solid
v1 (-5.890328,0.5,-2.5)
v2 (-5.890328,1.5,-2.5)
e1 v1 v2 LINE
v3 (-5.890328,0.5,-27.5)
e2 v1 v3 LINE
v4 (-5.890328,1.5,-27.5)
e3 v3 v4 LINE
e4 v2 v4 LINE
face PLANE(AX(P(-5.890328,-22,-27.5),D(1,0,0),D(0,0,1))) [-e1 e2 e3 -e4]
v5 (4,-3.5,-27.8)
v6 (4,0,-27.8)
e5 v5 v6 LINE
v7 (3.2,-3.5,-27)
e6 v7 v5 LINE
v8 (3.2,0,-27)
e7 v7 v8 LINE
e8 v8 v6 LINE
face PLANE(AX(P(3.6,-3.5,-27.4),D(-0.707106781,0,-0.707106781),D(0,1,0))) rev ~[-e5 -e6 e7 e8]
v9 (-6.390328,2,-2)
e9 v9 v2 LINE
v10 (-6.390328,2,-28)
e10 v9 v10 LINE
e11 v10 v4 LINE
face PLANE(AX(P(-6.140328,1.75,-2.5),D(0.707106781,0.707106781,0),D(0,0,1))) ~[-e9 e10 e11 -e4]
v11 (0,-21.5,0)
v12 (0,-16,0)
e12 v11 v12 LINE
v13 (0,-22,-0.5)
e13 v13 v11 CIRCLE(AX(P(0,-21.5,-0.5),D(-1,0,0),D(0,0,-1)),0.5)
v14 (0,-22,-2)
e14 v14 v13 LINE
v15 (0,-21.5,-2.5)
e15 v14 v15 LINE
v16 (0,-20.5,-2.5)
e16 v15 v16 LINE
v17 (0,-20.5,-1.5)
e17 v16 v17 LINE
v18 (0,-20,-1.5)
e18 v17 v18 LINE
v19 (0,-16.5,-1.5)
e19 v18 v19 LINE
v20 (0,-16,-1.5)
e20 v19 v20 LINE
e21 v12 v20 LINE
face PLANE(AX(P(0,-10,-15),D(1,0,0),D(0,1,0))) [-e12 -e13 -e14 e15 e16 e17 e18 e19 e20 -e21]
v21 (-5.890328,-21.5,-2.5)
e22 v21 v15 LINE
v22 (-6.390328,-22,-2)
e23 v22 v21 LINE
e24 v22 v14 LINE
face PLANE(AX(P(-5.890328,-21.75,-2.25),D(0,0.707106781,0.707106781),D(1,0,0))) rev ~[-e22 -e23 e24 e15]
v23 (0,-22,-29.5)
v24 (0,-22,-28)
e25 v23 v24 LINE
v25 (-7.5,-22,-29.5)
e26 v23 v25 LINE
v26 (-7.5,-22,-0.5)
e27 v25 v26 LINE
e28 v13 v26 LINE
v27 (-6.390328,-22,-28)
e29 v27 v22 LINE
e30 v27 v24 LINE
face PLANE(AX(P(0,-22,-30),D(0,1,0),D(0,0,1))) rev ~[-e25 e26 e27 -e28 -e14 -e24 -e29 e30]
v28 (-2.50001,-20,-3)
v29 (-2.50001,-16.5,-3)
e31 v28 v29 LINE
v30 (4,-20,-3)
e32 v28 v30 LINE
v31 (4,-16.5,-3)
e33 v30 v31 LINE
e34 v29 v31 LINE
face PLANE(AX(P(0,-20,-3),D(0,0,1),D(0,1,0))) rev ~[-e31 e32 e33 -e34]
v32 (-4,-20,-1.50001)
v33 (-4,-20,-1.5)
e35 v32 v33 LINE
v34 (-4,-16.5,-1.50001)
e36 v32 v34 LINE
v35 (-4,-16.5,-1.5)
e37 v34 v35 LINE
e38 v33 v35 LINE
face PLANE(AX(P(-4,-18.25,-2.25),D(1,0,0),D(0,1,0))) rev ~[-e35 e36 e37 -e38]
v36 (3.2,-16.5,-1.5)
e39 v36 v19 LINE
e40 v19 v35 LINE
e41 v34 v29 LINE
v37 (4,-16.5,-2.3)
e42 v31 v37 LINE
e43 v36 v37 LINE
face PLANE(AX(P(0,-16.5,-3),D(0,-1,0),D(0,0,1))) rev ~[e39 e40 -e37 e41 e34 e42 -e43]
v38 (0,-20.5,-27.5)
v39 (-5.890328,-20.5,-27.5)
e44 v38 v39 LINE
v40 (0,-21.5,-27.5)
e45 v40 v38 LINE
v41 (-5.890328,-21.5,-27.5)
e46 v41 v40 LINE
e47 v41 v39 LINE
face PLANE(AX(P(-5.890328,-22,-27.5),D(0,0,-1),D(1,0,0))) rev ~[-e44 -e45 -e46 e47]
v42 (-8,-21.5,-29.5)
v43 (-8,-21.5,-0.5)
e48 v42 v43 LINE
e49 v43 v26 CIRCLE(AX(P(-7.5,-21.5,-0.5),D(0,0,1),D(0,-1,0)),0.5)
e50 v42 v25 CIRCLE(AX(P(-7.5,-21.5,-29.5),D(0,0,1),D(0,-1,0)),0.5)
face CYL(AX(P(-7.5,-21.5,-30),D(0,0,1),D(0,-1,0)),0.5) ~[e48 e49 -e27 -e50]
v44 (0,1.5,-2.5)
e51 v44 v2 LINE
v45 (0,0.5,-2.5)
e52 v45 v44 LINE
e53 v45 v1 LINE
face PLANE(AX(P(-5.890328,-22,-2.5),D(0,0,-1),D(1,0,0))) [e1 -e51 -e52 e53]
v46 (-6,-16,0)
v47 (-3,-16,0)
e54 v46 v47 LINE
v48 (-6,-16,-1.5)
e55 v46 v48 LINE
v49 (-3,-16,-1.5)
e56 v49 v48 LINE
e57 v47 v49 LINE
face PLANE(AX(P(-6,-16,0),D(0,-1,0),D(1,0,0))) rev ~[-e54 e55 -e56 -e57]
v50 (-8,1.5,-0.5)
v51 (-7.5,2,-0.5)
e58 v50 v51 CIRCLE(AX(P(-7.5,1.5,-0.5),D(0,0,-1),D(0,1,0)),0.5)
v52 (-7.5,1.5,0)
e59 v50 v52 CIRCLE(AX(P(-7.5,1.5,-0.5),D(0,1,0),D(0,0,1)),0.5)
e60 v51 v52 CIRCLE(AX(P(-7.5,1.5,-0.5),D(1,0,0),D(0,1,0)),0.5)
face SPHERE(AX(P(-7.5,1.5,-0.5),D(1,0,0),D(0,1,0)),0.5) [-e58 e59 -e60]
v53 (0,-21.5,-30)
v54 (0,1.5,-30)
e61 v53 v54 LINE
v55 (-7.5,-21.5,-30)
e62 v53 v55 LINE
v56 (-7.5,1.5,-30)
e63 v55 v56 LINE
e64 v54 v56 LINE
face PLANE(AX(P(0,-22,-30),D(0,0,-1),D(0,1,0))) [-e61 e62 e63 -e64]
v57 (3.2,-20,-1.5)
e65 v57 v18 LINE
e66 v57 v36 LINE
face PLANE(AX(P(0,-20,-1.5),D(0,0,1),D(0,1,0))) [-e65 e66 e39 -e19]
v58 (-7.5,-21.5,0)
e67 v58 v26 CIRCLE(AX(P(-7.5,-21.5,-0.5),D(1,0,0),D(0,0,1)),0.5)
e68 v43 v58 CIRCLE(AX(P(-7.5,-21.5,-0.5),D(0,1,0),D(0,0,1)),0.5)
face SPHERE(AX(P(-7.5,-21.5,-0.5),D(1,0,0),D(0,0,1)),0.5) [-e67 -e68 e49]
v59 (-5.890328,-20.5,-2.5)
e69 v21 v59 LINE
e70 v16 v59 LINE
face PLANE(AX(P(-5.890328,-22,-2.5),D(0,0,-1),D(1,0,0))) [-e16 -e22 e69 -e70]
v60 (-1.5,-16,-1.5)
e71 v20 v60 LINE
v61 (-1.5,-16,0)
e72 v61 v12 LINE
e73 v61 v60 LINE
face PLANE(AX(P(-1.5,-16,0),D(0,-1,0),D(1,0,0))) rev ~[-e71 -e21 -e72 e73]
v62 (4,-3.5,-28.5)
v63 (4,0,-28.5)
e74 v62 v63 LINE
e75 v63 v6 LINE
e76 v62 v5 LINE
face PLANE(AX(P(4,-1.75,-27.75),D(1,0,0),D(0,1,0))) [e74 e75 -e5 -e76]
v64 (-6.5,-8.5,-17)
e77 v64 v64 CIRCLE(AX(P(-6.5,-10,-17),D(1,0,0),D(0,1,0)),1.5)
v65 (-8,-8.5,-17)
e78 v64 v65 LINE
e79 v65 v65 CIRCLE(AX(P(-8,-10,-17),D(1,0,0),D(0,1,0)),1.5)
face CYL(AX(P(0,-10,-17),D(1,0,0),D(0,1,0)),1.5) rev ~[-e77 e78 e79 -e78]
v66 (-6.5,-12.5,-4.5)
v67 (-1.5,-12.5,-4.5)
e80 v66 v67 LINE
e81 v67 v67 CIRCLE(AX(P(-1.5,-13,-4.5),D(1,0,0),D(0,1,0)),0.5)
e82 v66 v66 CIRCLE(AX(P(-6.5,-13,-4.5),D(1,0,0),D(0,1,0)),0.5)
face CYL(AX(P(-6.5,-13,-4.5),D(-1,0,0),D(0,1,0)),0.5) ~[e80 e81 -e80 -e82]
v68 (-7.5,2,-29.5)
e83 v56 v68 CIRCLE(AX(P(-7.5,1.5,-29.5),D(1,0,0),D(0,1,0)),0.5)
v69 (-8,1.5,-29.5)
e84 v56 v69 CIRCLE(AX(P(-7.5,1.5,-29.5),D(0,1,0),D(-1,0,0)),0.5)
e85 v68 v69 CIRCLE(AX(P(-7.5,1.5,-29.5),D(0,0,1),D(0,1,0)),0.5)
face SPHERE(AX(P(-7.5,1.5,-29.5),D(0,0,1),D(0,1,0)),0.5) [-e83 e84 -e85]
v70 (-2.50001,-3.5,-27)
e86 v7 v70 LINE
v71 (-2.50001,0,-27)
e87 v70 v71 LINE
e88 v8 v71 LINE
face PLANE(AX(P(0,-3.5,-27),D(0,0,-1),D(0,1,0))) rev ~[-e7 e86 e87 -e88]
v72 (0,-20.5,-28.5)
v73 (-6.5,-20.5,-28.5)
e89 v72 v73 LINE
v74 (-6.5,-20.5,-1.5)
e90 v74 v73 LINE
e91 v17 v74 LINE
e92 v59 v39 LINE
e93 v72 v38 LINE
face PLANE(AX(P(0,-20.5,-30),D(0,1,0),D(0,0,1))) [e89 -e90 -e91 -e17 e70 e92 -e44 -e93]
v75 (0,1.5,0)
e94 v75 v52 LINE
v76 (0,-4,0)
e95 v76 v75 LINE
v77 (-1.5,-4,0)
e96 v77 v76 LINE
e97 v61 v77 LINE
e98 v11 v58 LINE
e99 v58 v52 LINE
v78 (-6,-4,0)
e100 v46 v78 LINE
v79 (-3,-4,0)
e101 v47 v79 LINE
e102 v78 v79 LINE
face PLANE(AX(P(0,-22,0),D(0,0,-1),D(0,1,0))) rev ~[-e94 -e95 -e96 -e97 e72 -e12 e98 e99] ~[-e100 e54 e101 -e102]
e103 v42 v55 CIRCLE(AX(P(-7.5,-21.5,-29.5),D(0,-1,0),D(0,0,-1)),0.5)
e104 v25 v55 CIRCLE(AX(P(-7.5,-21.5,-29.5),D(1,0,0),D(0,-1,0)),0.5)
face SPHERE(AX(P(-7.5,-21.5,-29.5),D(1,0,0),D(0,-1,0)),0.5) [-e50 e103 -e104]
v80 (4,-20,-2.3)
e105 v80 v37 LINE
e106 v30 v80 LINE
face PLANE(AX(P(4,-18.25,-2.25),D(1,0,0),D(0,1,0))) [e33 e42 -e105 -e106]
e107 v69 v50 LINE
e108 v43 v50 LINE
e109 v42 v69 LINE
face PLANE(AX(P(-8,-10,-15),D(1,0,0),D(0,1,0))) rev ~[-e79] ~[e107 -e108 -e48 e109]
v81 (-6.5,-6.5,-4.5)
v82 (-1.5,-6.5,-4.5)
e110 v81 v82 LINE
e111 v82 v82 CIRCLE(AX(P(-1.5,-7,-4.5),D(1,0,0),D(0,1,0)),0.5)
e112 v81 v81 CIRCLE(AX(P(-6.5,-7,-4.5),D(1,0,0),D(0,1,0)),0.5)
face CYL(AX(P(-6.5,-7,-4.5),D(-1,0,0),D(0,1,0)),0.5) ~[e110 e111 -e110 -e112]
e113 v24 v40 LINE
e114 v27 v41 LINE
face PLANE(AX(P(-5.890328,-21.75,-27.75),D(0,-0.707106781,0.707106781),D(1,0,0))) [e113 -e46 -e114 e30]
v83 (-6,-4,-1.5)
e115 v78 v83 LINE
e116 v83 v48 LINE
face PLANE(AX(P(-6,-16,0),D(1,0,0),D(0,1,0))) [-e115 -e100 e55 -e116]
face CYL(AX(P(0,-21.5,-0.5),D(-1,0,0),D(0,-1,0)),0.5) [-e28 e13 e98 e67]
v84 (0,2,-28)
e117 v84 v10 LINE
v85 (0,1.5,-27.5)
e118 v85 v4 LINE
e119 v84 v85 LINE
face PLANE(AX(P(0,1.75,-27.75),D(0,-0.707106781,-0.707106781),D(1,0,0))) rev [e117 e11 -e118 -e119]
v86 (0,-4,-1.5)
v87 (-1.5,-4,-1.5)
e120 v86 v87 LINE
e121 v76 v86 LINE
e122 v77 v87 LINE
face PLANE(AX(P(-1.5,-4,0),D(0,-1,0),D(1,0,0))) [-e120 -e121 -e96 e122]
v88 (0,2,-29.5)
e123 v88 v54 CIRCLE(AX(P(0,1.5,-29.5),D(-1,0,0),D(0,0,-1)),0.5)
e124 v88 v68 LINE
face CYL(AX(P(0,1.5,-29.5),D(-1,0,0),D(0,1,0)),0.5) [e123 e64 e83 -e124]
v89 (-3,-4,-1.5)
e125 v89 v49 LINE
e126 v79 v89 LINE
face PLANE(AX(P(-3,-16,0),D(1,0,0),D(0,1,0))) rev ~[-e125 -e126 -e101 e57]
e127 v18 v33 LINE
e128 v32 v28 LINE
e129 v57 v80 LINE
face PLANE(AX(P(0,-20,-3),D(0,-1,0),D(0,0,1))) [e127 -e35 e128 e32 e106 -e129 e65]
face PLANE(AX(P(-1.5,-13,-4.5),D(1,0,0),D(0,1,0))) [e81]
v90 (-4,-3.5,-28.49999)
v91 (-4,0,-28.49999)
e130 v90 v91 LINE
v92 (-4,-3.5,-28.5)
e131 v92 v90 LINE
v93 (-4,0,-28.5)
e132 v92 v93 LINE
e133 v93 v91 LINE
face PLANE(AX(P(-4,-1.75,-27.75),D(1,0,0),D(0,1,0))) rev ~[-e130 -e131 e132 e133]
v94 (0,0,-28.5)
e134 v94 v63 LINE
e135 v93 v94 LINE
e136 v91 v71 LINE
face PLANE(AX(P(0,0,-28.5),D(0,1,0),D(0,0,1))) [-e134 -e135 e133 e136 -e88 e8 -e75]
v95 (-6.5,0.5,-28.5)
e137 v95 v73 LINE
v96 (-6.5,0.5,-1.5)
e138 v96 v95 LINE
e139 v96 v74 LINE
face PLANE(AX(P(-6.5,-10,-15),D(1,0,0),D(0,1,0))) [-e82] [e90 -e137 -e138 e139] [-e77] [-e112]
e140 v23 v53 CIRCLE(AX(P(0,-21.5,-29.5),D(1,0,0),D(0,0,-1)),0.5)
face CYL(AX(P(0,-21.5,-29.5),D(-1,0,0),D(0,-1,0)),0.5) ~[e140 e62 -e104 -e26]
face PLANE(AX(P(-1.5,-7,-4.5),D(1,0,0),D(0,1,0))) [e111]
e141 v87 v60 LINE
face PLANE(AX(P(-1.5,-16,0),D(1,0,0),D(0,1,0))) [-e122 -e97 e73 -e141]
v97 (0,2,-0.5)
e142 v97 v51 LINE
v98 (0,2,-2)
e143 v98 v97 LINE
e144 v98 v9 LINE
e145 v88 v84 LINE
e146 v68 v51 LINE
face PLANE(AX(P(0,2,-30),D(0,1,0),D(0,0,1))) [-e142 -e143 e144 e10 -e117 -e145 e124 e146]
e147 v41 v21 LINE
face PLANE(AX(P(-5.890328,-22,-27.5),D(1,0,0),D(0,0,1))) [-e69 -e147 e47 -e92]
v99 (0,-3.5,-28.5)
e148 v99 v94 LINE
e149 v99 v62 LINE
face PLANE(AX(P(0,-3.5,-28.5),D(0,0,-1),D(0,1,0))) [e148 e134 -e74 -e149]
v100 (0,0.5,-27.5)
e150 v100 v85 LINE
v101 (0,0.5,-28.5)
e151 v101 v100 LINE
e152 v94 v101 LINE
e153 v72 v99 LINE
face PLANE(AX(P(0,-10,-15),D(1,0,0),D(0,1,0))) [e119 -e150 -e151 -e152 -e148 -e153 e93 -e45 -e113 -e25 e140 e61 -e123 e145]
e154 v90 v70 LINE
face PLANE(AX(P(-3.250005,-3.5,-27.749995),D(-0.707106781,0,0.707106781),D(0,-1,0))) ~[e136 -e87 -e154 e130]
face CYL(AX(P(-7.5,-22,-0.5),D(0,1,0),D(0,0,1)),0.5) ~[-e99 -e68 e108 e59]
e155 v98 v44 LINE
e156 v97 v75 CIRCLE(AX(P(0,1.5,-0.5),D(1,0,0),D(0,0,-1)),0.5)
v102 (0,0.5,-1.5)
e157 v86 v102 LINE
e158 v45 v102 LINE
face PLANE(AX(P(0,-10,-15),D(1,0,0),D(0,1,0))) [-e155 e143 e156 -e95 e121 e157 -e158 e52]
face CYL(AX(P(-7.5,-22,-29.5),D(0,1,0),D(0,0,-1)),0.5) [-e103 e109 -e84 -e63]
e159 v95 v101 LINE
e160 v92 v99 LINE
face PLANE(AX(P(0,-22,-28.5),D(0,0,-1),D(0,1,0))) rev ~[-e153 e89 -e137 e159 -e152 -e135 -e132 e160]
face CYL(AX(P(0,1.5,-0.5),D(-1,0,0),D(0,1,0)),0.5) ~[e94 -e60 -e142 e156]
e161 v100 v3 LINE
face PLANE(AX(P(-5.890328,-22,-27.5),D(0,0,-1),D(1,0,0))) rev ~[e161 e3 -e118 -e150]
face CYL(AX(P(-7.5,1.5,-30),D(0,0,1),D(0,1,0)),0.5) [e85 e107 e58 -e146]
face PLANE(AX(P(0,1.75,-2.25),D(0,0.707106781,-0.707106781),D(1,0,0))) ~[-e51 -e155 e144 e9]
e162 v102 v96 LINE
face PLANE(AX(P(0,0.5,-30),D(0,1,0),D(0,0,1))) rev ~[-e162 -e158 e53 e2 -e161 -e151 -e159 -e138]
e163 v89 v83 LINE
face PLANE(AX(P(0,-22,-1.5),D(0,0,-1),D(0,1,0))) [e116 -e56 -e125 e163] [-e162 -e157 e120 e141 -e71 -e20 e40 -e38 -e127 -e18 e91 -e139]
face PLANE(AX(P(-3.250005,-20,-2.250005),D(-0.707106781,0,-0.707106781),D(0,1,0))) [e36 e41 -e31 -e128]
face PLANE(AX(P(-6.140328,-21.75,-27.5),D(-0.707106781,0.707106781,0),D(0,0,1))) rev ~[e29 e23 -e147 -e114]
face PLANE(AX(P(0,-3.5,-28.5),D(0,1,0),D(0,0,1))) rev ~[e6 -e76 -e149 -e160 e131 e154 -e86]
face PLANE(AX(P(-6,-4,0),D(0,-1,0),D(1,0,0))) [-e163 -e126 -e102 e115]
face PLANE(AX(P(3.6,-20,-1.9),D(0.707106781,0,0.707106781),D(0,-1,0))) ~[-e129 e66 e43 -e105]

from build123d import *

# Parameters (mm, degrees)
F1_W      = 24
F1_H      = 30
F2_DEPTH  = 8
F3_T      = -1.5
F4_W      = 3
F4_H      = 12
F5_DEPTH  = 5
F6_W      = 8
F6_H      = 25
F7_DEPTH  = 30
F8_W      = 3.5
F8_H      = 1.5
F9_DEPTH  = 4
F10_SIZE  = 0.8
F11_R     = 1.5
F12_DEPTH = 25
F13_R     = 0.5
F14_SIZE  = 0.5
F15_R     = 0.5
F16_DEPTH = 5
F17_SIZE  = 1.49999


# Not quite as in the source:
# - a fillet or chamfer is up to 0.001 mm smaller than in the source, because OpenCascade refuses the exact size


with BuildPart() as f2:
    # F1 (on Right) → F2 (new body)
    with BuildSketch(Plane.YZ):
        with Locations((-10, -15)):
            Rectangle(F1_W, F1_H)
    extrude(amount=-F2_DEPTH)

    # F3
    f3_openings = [f2.faces().sort_by_distance(p)[0] for p in [
        (0, -10, -15),
    ]]
    offset(amount=F3_T, openings=f3_openings)

    # F4 (on Top) → F5 (cut)
    with BuildSketch(Plane.XY):
        with Locations((0, -10)):
            Rectangle(F4_W, F4_H)
        with Locations((-4.5, -10)):
            Rectangle(F4_W, F4_H)
    extrude(amount=-F5_DEPTH, mode=Mode.SUBTRACT)

    # F6 (on face) → F7 (cut)
    with BuildSketch(Plane.XZ.offset(22)):
        with Locations((-1.8903282698, -15)):
            Rectangle(F6_W, F6_H)
    extrude(amount=-F7_DEPTH, mode=Mode.SUBTRACT)

    # F8 (on Right) → F9 (join, symmetric)
    with BuildSketch(Plane.YZ):
        with Locations((-18.25, -2.25)):
            Rectangle(F8_W, F8_H)
        with Locations((-1.75, -27.75)):
            Rectangle(F8_W, F8_H)
    extrude(amount=F9_DEPTH, both=True)

    # F10
    f10_edges = [f2.edges().sort_by_distance(p)[0] for p in [
        (4, -18.25, -1.5),
        (4, -1.75, -27),
    ]]
    chamfer(f10_edges, length=F10_SIZE)

    # F11 (on Right) → F12 (cut)
    with BuildSketch(Plane.YZ):
        with Locations((-10, -17)):
            Circle(F11_R)
    extrude(amount=-F12_DEPTH, mode=Mode.SUBTRACT)

    # F13
    f13_edges = [f2.edges().sort_by_distance(p)[0] for p in [
        (-4, 2, 0),
        (-8, 2, -15),
        (-4, -22, 0),
        (-4, -22, -30),
        (-4, 2, -30),
        (-8, -10, 0),
        (-8, -22, -15),
        (-8, -10, -30),
    ]]
    fillet(f13_edges, radius=F13_R)

    # F14
    f14_edges = [f2.edges().sort_by_distance(p)[0] for p in [
        (-5.890328, 2, -15),
        (-2.945164, 2, -2.5),
        (-2.945164, 2, -27.5),
        (-2.945164, -22, -2.5),
        (-5.890328, -22, -15),
        (-2.945164, -22, -27.5),
    ]]
    chamfer(f14_edges, length=F14_SIZE)

    # F15 (on face) → F16 (join)
    with BuildSketch(Plane.YZ.offset(-6.5)):
        with Locations((-13, -4.5)):
            Circle(F15_R)
        with Locations((-7, -4.5)):
            Circle(F15_R)
    extrude(amount=F16_DEPTH)

    # F17 (size 1.5 in the source; OpenCascade refuses exactly that, so slightly less here)
    f17_edges = [f2.edges().sort_by_distance(p)[0] for p in [
        (-4, -18.25, -3),
        (-4, -1.75, -27),
    ]]
    chamfer(f17_edges, length=F17_SIZE)


solid = f2.part
